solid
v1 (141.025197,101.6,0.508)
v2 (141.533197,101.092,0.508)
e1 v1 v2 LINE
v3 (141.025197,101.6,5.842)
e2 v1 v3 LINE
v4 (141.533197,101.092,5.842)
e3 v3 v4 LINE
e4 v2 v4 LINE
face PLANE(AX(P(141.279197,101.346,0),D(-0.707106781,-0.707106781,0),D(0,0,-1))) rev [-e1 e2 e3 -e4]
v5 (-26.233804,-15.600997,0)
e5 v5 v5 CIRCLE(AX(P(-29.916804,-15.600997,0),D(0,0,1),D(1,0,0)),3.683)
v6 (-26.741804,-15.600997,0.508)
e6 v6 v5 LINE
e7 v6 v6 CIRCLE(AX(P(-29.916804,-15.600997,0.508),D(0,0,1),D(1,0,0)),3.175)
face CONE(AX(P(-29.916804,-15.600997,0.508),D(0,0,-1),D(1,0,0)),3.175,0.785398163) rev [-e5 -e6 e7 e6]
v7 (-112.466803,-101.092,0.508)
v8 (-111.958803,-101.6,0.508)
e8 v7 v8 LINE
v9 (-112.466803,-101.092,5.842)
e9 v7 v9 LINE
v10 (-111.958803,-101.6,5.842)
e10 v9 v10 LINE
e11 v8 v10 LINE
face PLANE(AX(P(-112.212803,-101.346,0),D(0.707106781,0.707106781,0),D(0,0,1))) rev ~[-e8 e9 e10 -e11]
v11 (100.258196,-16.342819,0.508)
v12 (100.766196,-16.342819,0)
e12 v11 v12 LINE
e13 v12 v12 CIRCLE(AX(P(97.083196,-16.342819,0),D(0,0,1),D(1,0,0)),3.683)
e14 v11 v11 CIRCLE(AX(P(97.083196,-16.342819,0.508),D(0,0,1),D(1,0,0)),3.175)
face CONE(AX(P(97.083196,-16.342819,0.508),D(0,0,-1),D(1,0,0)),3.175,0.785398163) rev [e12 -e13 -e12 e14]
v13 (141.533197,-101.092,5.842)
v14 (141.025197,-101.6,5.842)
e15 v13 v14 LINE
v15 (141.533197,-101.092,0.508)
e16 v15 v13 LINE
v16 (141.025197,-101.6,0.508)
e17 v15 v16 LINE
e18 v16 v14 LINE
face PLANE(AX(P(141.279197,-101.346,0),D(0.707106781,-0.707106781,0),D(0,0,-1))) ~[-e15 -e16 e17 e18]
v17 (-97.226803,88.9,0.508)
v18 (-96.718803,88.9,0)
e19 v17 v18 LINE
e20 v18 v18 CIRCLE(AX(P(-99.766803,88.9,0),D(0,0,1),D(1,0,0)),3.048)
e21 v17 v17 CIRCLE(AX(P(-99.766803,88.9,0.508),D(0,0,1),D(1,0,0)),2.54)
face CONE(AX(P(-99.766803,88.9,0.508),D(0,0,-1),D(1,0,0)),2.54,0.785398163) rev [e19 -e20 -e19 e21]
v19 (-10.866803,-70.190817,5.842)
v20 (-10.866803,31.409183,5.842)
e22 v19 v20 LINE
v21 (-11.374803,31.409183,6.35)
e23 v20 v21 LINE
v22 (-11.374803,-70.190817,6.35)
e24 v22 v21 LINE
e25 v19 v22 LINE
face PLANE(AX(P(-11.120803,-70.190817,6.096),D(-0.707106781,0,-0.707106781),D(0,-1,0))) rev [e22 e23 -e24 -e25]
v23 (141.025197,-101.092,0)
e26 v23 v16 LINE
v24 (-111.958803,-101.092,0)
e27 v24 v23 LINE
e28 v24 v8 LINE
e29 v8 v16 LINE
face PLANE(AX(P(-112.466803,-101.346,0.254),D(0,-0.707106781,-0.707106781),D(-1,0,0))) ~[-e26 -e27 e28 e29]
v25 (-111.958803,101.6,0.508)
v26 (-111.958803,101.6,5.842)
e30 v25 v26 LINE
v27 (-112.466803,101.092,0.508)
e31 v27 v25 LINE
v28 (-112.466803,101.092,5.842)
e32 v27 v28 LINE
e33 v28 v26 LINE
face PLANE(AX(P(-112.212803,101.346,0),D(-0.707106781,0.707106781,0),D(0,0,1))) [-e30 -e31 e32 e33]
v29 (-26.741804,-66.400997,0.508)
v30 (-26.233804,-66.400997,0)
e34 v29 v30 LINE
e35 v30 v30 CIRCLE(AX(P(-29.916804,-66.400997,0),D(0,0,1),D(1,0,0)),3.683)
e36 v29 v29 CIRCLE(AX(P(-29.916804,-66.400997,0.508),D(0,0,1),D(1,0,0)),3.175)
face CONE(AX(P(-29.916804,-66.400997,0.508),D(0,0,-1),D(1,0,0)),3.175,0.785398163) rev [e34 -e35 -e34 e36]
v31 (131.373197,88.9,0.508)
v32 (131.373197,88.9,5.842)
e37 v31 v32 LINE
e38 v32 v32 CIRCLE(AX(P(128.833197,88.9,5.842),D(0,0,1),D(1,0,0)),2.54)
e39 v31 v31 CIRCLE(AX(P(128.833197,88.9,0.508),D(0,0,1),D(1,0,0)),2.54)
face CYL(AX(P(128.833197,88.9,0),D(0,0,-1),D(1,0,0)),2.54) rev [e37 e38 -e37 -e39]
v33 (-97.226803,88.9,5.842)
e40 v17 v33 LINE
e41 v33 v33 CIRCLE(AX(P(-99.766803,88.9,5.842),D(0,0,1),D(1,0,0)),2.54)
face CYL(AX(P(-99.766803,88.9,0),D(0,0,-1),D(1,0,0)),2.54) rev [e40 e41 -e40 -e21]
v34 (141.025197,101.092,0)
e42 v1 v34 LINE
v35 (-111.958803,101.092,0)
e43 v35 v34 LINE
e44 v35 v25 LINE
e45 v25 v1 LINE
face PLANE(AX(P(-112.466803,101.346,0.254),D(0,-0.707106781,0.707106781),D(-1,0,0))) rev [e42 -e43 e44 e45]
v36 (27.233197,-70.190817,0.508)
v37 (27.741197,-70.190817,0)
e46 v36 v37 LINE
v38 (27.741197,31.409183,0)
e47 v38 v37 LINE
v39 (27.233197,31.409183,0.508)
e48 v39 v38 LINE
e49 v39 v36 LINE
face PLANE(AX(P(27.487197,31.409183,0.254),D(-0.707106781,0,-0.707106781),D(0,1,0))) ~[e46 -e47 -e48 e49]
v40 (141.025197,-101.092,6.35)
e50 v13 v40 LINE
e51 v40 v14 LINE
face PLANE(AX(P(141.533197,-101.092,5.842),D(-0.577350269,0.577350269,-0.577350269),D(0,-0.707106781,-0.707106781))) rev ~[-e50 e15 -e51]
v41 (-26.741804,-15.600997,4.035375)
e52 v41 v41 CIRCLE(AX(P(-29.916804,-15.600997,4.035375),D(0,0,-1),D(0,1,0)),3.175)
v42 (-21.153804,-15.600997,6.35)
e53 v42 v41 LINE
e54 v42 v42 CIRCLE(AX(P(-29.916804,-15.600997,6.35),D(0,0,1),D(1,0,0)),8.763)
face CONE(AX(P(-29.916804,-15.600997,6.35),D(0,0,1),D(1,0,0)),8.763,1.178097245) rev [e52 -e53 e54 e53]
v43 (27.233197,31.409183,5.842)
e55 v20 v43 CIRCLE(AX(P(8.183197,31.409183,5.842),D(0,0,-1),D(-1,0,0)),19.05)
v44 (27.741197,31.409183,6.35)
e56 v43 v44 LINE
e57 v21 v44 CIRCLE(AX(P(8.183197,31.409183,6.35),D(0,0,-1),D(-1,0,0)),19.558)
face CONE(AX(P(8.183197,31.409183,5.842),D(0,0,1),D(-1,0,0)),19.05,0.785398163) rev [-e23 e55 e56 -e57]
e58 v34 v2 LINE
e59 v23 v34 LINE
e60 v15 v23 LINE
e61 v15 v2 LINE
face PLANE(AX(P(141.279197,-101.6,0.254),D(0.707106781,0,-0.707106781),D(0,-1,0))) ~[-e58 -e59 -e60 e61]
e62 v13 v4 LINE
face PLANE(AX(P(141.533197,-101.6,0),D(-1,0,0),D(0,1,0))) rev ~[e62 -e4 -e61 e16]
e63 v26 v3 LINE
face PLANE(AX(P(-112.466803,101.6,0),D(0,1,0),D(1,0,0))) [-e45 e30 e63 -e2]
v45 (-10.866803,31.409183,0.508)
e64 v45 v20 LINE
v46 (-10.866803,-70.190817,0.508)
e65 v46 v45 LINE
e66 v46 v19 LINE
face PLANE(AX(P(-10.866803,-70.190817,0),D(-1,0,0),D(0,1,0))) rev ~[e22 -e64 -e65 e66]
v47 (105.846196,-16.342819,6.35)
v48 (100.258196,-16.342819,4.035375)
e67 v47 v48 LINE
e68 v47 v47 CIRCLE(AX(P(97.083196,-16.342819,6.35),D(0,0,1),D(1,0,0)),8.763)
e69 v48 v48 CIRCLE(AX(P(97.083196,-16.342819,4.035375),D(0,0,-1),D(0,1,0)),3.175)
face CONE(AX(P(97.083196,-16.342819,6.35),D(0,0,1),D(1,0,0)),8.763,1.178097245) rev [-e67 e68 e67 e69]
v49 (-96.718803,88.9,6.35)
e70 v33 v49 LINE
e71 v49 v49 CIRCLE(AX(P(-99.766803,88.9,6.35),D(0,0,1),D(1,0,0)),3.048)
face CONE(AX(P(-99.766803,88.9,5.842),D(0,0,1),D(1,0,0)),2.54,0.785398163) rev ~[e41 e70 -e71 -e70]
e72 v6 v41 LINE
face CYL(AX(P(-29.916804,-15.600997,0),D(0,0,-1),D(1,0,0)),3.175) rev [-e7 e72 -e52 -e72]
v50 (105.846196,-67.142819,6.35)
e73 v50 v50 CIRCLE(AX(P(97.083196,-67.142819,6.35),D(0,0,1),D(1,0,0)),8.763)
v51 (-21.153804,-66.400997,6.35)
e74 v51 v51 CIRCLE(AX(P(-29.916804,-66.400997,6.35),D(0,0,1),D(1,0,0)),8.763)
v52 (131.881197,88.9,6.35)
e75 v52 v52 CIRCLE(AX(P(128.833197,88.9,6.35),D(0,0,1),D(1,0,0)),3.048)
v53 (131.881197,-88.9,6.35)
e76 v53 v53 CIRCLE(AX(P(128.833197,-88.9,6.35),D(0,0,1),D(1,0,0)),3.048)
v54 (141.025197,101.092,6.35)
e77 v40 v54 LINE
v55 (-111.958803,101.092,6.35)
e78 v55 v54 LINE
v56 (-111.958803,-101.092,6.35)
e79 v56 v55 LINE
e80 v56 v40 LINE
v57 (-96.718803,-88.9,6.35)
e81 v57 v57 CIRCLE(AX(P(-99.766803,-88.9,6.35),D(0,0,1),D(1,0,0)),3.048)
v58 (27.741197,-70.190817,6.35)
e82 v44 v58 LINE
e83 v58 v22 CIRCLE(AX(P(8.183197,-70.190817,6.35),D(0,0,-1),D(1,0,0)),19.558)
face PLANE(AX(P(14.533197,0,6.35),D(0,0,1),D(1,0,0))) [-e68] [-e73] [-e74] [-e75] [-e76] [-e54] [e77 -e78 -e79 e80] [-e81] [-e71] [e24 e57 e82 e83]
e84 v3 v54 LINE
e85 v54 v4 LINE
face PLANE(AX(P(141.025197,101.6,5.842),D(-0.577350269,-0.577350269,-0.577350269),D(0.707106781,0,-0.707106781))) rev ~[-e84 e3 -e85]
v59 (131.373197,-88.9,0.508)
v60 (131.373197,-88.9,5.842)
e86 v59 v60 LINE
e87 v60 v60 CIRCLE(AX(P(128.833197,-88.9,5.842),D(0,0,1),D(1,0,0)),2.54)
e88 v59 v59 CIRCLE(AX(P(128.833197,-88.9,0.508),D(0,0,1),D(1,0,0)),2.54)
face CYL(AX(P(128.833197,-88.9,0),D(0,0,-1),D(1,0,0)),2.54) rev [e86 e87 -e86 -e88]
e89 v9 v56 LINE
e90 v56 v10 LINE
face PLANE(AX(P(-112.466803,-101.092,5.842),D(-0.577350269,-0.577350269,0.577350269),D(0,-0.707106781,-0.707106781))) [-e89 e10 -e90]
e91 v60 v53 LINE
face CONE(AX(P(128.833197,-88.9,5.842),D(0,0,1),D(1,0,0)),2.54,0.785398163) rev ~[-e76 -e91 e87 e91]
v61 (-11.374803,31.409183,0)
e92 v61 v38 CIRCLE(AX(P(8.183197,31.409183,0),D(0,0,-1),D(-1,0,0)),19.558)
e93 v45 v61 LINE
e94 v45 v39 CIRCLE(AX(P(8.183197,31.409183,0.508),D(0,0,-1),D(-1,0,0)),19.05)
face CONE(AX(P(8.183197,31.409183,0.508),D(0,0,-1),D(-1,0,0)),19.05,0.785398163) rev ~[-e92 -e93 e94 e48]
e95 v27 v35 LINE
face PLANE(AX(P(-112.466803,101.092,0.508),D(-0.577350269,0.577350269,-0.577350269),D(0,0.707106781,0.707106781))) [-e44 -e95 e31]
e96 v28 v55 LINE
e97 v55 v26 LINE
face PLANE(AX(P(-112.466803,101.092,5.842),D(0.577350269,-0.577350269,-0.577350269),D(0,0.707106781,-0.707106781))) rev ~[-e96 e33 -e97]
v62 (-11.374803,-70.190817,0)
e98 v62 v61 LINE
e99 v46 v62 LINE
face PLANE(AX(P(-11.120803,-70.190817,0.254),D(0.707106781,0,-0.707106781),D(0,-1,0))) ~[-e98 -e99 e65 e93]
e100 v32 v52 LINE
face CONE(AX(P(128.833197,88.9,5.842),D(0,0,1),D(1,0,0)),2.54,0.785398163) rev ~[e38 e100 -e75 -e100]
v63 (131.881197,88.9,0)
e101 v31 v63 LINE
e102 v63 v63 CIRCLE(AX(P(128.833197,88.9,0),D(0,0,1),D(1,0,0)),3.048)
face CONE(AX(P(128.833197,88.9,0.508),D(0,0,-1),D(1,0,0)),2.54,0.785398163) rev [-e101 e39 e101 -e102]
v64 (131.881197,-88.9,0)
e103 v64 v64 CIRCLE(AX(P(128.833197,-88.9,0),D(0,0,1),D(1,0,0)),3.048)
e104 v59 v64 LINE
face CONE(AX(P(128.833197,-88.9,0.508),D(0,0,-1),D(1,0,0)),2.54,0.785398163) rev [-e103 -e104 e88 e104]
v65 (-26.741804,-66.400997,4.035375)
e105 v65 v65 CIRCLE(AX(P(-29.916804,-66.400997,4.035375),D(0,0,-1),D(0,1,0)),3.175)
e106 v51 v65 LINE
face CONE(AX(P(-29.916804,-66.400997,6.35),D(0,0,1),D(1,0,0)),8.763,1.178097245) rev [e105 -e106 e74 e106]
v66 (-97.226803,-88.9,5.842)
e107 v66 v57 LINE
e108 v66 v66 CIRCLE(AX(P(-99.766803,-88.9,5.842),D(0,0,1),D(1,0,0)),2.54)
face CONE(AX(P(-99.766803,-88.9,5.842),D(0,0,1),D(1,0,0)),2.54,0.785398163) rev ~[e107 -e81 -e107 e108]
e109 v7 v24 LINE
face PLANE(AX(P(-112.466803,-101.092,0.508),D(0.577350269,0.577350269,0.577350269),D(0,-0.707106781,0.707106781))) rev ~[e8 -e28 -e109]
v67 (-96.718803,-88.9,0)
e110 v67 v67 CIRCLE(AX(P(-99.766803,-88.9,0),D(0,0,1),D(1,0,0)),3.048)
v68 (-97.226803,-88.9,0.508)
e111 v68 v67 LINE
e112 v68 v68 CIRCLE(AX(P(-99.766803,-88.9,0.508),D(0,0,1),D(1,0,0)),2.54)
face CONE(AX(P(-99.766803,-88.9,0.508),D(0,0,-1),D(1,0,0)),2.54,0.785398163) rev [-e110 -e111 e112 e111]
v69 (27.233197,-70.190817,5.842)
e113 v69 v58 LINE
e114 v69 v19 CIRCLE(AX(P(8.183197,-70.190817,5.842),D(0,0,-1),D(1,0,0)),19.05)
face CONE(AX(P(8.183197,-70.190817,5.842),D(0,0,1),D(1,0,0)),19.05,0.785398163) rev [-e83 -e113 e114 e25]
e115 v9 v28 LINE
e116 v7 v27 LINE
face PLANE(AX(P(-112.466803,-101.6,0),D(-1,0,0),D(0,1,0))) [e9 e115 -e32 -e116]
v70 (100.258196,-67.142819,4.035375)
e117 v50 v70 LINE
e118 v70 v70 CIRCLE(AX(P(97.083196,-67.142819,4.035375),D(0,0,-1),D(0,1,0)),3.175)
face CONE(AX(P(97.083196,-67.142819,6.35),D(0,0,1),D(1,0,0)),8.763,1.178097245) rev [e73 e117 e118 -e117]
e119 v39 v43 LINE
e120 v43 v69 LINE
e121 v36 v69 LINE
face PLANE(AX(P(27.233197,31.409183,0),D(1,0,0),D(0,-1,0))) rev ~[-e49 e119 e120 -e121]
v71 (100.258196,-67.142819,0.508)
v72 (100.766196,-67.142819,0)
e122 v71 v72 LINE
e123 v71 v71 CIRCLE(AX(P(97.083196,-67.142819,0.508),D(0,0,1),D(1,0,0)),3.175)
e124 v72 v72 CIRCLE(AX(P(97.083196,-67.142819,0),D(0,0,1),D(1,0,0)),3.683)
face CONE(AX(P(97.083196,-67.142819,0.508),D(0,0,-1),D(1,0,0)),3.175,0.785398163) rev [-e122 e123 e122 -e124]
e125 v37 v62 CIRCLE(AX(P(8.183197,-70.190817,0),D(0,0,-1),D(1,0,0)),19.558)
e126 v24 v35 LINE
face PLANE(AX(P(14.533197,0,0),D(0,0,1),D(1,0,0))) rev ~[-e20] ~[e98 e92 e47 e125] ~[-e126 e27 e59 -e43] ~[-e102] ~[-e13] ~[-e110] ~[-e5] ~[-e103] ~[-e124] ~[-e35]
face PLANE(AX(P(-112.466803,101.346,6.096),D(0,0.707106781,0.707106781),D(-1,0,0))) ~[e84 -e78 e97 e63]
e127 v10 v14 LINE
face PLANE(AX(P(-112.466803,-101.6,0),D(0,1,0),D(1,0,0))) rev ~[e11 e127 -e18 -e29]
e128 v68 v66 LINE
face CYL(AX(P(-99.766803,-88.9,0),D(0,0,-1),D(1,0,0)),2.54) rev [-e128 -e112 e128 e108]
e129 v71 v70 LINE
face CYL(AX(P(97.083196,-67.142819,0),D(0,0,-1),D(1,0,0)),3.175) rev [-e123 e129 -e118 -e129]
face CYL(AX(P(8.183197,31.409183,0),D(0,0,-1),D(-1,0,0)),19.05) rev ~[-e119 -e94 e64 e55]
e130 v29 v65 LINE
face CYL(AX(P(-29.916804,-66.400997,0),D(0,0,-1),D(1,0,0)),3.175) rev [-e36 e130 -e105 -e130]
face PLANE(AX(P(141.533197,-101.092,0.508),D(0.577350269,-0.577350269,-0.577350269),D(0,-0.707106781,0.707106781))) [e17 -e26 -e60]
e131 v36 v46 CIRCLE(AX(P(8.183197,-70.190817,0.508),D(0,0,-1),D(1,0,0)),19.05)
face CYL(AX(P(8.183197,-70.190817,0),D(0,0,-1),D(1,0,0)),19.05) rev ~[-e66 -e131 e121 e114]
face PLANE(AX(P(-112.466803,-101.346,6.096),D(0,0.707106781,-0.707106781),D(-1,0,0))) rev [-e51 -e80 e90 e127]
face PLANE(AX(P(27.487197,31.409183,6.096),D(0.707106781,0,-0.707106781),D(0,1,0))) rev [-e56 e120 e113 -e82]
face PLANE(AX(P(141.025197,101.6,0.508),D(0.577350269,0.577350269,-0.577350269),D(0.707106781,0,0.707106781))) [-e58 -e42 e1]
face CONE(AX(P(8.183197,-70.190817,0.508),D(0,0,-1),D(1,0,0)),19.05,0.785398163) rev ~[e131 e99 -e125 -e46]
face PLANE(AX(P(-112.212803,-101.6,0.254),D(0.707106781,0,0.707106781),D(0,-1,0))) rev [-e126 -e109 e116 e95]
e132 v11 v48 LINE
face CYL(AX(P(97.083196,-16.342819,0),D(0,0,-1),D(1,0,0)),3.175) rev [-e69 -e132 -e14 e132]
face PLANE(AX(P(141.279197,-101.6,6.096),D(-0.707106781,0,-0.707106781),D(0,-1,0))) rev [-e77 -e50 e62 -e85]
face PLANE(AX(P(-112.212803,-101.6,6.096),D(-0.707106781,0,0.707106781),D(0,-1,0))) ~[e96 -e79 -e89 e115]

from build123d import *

# Parameters (mm, degrees)
F0_W     = 254
F0_H     = 203.2
F0_R     = 2.54
F0_R_2   = 3.175
F1_DEPTH = 6.35
F2_SIZE  = 0.508


# Not quite as in the source:
# - a fillet or chamfer that OpenCascade refuses, or shapes differently, is made with other operations: its cross-section is extruded or revolved along the edge and cut away or added


with BuildPart() as f1:
    # F0 (on Top) → F1 (new body)
    with BuildSketch(Plane.XY):
        with Locations((14.533196536, 0)):
            Rectangle(F0_W, F0_H)
        with Locations((-99.766803464, -88.9)):
            Circle(F0_R, mode=Mode.SUBTRACT)
        with Locations((-29.9168042839, -66.4009973407)):
            Circle(F0_R_2, mode=Mode.SUBTRACT)
        with Locations((-29.9168042839, -15.6009973407)):
            Circle(F0_R_2, mode=Mode.SUBTRACT)
        with BuildLine():
            ThreePointArc((27.2331968829, -70.1908171177), (8.1831968829, -89.2408171177), (-10.8668031171, -70.1908171177))
            Line((-10.8668031171, -70.1908171177), (-10.8668031171, 31.4091828823))
            ThreePointArc((-10.8668031171, 31.4091828823), (8.1831968829, 50.4591828823), (27.2331968829, 31.4091828823))
            Line((27.2331968829, 31.4091828823), (27.2331968829, -70.1908171177))
        make_face(mode=Mode.SUBTRACT)
        with Locations((128.833196536, -88.9)):
            Circle(F0_R, mode=Mode.SUBTRACT)
        with Locations((97.0831957161, -67.1428190649)):
            Circle(F0_R_2, mode=Mode.SUBTRACT)
        with Locations((97.0831957161, -16.3428190649)):
            Circle(F0_R_2, mode=Mode.SUBTRACT)
        with Locations((-99.766803464, 88.9)):
            Circle(F0_R, mode=Mode.SUBTRACT)
        with Locations((128.833196536, 88.9)):
            Circle(F0_R, mode=Mode.SUBTRACT)
    extrude(amount=F1_DEPTH)

    # F2
    f2_edges = [f1.edges().sort_by_distance(p)[0] for p in [
        (14.533197, -101.6, 6.35),
        (141.533197, 0, 6.35),
        (14.533197, 101.6, 6.35),
        (-112.466803, 0, 6.35),
        (-102.306803, -88.9, 6.35),
        (-33.091804, -66.400997, 6.35),
        (-33.091804, -15.600997, 6.35),
        (8.183197, 50.459183, 6.35),
        (27.233197, -19.390817, 6.35),
        (8.183197, -89.240817, 6.35),
        (-10.866803, -19.390817, 6.35),
        (126.293197, -88.9, 6.35),
        (93.908196, -67.142819, 6.35),
        (93.908196, -16.342819, 6.35),
        (-102.306803, 88.9, 6.35),
        (126.293197, 88.9, 6.35),
        (14.533197, -101.6, 0),
        (141.533197, 0, 0),
        (14.533197, 101.6, 0),
        (-112.466803, 0, 0),
        (-102.306803, -88.9, 0),
        (-33.091804, -66.400997, 0),
        (-33.091804, -15.600997, 0),
        (8.183197, 50.459183, 0),
        (27.233197, -19.390817, 0),
        (8.183197, -89.240817, 0),
        (-10.866803, -19.390817, 0),
        (126.293197, -88.9, 0),
        (93.908196, -67.142819, 0),
        (93.908196, -16.342819, 0),
        (-102.306803, 88.9, 0),
        (126.293197, 88.9, 0),
        (-112.466803, -101.6, 3.175),
        (-112.466803, 101.6, 3.175),
        (141.533197, -101.6, 3.175),
        (141.533197, 101.6, 3.175),
    ]]
    chamfer(f2_edges, length=F2_SIZE)

    # F3: chamfer of 5.08 on 4 edges, made by hand

    # F3_s1 → F3_t2 (revolve, cut)
    with BuildSketch(Plane.XZ.offset(66.4009973407)):
        Polygon((-21.1538042839, 6.35), (-29.8259067323, 2.7578975516), (-26.2338042839, 6.35), align=None)
    revolve(axis=Axis((-29.9168042839, -66.4009973407, 6.35), (0, 0, 1)), mode=Mode.SUBTRACT)

    # F3_s3 → F3_t4 (revolve, cut)
    with BuildSketch(Plane.XZ.offset(15.6009973407)):
        Polygon((-21.1538042839, 6.35), (-29.8259067323, 2.7578975516), (-26.2338042839, 6.35), align=None)
    revolve(axis=Axis((-29.9168042839, -15.6009973407, 6.35), (0, 0, 1)), mode=Mode.SUBTRACT)

    # F3_s5 → F3_t6 (revolve, cut)
    with BuildSketch(Plane.XZ.offset(67.1428190649)):
        Polygon((105.8461957161, 6.35), (97.1740932677, 2.7578975516), (100.7661957161, 6.35), align=None)
    revolve(axis=Axis((97.0831957161, -67.1428190649, 6.35), (0, 0, 1)), mode=Mode.SUBTRACT)

    # F3_s7 → F3_t8 (revolve, cut)
    with BuildSketch(Plane.XZ.offset(16.3428190649)):
        Polygon((105.8461957161, 6.35), (97.1740932677, 2.7578975516), (100.7661957161, 6.35), align=None)
    revolve(axis=Axis((97.0831957161, -16.3428190649, 6.35), (0, 0, 1)), mode=Mode.SUBTRACT)


solid = f1.part
